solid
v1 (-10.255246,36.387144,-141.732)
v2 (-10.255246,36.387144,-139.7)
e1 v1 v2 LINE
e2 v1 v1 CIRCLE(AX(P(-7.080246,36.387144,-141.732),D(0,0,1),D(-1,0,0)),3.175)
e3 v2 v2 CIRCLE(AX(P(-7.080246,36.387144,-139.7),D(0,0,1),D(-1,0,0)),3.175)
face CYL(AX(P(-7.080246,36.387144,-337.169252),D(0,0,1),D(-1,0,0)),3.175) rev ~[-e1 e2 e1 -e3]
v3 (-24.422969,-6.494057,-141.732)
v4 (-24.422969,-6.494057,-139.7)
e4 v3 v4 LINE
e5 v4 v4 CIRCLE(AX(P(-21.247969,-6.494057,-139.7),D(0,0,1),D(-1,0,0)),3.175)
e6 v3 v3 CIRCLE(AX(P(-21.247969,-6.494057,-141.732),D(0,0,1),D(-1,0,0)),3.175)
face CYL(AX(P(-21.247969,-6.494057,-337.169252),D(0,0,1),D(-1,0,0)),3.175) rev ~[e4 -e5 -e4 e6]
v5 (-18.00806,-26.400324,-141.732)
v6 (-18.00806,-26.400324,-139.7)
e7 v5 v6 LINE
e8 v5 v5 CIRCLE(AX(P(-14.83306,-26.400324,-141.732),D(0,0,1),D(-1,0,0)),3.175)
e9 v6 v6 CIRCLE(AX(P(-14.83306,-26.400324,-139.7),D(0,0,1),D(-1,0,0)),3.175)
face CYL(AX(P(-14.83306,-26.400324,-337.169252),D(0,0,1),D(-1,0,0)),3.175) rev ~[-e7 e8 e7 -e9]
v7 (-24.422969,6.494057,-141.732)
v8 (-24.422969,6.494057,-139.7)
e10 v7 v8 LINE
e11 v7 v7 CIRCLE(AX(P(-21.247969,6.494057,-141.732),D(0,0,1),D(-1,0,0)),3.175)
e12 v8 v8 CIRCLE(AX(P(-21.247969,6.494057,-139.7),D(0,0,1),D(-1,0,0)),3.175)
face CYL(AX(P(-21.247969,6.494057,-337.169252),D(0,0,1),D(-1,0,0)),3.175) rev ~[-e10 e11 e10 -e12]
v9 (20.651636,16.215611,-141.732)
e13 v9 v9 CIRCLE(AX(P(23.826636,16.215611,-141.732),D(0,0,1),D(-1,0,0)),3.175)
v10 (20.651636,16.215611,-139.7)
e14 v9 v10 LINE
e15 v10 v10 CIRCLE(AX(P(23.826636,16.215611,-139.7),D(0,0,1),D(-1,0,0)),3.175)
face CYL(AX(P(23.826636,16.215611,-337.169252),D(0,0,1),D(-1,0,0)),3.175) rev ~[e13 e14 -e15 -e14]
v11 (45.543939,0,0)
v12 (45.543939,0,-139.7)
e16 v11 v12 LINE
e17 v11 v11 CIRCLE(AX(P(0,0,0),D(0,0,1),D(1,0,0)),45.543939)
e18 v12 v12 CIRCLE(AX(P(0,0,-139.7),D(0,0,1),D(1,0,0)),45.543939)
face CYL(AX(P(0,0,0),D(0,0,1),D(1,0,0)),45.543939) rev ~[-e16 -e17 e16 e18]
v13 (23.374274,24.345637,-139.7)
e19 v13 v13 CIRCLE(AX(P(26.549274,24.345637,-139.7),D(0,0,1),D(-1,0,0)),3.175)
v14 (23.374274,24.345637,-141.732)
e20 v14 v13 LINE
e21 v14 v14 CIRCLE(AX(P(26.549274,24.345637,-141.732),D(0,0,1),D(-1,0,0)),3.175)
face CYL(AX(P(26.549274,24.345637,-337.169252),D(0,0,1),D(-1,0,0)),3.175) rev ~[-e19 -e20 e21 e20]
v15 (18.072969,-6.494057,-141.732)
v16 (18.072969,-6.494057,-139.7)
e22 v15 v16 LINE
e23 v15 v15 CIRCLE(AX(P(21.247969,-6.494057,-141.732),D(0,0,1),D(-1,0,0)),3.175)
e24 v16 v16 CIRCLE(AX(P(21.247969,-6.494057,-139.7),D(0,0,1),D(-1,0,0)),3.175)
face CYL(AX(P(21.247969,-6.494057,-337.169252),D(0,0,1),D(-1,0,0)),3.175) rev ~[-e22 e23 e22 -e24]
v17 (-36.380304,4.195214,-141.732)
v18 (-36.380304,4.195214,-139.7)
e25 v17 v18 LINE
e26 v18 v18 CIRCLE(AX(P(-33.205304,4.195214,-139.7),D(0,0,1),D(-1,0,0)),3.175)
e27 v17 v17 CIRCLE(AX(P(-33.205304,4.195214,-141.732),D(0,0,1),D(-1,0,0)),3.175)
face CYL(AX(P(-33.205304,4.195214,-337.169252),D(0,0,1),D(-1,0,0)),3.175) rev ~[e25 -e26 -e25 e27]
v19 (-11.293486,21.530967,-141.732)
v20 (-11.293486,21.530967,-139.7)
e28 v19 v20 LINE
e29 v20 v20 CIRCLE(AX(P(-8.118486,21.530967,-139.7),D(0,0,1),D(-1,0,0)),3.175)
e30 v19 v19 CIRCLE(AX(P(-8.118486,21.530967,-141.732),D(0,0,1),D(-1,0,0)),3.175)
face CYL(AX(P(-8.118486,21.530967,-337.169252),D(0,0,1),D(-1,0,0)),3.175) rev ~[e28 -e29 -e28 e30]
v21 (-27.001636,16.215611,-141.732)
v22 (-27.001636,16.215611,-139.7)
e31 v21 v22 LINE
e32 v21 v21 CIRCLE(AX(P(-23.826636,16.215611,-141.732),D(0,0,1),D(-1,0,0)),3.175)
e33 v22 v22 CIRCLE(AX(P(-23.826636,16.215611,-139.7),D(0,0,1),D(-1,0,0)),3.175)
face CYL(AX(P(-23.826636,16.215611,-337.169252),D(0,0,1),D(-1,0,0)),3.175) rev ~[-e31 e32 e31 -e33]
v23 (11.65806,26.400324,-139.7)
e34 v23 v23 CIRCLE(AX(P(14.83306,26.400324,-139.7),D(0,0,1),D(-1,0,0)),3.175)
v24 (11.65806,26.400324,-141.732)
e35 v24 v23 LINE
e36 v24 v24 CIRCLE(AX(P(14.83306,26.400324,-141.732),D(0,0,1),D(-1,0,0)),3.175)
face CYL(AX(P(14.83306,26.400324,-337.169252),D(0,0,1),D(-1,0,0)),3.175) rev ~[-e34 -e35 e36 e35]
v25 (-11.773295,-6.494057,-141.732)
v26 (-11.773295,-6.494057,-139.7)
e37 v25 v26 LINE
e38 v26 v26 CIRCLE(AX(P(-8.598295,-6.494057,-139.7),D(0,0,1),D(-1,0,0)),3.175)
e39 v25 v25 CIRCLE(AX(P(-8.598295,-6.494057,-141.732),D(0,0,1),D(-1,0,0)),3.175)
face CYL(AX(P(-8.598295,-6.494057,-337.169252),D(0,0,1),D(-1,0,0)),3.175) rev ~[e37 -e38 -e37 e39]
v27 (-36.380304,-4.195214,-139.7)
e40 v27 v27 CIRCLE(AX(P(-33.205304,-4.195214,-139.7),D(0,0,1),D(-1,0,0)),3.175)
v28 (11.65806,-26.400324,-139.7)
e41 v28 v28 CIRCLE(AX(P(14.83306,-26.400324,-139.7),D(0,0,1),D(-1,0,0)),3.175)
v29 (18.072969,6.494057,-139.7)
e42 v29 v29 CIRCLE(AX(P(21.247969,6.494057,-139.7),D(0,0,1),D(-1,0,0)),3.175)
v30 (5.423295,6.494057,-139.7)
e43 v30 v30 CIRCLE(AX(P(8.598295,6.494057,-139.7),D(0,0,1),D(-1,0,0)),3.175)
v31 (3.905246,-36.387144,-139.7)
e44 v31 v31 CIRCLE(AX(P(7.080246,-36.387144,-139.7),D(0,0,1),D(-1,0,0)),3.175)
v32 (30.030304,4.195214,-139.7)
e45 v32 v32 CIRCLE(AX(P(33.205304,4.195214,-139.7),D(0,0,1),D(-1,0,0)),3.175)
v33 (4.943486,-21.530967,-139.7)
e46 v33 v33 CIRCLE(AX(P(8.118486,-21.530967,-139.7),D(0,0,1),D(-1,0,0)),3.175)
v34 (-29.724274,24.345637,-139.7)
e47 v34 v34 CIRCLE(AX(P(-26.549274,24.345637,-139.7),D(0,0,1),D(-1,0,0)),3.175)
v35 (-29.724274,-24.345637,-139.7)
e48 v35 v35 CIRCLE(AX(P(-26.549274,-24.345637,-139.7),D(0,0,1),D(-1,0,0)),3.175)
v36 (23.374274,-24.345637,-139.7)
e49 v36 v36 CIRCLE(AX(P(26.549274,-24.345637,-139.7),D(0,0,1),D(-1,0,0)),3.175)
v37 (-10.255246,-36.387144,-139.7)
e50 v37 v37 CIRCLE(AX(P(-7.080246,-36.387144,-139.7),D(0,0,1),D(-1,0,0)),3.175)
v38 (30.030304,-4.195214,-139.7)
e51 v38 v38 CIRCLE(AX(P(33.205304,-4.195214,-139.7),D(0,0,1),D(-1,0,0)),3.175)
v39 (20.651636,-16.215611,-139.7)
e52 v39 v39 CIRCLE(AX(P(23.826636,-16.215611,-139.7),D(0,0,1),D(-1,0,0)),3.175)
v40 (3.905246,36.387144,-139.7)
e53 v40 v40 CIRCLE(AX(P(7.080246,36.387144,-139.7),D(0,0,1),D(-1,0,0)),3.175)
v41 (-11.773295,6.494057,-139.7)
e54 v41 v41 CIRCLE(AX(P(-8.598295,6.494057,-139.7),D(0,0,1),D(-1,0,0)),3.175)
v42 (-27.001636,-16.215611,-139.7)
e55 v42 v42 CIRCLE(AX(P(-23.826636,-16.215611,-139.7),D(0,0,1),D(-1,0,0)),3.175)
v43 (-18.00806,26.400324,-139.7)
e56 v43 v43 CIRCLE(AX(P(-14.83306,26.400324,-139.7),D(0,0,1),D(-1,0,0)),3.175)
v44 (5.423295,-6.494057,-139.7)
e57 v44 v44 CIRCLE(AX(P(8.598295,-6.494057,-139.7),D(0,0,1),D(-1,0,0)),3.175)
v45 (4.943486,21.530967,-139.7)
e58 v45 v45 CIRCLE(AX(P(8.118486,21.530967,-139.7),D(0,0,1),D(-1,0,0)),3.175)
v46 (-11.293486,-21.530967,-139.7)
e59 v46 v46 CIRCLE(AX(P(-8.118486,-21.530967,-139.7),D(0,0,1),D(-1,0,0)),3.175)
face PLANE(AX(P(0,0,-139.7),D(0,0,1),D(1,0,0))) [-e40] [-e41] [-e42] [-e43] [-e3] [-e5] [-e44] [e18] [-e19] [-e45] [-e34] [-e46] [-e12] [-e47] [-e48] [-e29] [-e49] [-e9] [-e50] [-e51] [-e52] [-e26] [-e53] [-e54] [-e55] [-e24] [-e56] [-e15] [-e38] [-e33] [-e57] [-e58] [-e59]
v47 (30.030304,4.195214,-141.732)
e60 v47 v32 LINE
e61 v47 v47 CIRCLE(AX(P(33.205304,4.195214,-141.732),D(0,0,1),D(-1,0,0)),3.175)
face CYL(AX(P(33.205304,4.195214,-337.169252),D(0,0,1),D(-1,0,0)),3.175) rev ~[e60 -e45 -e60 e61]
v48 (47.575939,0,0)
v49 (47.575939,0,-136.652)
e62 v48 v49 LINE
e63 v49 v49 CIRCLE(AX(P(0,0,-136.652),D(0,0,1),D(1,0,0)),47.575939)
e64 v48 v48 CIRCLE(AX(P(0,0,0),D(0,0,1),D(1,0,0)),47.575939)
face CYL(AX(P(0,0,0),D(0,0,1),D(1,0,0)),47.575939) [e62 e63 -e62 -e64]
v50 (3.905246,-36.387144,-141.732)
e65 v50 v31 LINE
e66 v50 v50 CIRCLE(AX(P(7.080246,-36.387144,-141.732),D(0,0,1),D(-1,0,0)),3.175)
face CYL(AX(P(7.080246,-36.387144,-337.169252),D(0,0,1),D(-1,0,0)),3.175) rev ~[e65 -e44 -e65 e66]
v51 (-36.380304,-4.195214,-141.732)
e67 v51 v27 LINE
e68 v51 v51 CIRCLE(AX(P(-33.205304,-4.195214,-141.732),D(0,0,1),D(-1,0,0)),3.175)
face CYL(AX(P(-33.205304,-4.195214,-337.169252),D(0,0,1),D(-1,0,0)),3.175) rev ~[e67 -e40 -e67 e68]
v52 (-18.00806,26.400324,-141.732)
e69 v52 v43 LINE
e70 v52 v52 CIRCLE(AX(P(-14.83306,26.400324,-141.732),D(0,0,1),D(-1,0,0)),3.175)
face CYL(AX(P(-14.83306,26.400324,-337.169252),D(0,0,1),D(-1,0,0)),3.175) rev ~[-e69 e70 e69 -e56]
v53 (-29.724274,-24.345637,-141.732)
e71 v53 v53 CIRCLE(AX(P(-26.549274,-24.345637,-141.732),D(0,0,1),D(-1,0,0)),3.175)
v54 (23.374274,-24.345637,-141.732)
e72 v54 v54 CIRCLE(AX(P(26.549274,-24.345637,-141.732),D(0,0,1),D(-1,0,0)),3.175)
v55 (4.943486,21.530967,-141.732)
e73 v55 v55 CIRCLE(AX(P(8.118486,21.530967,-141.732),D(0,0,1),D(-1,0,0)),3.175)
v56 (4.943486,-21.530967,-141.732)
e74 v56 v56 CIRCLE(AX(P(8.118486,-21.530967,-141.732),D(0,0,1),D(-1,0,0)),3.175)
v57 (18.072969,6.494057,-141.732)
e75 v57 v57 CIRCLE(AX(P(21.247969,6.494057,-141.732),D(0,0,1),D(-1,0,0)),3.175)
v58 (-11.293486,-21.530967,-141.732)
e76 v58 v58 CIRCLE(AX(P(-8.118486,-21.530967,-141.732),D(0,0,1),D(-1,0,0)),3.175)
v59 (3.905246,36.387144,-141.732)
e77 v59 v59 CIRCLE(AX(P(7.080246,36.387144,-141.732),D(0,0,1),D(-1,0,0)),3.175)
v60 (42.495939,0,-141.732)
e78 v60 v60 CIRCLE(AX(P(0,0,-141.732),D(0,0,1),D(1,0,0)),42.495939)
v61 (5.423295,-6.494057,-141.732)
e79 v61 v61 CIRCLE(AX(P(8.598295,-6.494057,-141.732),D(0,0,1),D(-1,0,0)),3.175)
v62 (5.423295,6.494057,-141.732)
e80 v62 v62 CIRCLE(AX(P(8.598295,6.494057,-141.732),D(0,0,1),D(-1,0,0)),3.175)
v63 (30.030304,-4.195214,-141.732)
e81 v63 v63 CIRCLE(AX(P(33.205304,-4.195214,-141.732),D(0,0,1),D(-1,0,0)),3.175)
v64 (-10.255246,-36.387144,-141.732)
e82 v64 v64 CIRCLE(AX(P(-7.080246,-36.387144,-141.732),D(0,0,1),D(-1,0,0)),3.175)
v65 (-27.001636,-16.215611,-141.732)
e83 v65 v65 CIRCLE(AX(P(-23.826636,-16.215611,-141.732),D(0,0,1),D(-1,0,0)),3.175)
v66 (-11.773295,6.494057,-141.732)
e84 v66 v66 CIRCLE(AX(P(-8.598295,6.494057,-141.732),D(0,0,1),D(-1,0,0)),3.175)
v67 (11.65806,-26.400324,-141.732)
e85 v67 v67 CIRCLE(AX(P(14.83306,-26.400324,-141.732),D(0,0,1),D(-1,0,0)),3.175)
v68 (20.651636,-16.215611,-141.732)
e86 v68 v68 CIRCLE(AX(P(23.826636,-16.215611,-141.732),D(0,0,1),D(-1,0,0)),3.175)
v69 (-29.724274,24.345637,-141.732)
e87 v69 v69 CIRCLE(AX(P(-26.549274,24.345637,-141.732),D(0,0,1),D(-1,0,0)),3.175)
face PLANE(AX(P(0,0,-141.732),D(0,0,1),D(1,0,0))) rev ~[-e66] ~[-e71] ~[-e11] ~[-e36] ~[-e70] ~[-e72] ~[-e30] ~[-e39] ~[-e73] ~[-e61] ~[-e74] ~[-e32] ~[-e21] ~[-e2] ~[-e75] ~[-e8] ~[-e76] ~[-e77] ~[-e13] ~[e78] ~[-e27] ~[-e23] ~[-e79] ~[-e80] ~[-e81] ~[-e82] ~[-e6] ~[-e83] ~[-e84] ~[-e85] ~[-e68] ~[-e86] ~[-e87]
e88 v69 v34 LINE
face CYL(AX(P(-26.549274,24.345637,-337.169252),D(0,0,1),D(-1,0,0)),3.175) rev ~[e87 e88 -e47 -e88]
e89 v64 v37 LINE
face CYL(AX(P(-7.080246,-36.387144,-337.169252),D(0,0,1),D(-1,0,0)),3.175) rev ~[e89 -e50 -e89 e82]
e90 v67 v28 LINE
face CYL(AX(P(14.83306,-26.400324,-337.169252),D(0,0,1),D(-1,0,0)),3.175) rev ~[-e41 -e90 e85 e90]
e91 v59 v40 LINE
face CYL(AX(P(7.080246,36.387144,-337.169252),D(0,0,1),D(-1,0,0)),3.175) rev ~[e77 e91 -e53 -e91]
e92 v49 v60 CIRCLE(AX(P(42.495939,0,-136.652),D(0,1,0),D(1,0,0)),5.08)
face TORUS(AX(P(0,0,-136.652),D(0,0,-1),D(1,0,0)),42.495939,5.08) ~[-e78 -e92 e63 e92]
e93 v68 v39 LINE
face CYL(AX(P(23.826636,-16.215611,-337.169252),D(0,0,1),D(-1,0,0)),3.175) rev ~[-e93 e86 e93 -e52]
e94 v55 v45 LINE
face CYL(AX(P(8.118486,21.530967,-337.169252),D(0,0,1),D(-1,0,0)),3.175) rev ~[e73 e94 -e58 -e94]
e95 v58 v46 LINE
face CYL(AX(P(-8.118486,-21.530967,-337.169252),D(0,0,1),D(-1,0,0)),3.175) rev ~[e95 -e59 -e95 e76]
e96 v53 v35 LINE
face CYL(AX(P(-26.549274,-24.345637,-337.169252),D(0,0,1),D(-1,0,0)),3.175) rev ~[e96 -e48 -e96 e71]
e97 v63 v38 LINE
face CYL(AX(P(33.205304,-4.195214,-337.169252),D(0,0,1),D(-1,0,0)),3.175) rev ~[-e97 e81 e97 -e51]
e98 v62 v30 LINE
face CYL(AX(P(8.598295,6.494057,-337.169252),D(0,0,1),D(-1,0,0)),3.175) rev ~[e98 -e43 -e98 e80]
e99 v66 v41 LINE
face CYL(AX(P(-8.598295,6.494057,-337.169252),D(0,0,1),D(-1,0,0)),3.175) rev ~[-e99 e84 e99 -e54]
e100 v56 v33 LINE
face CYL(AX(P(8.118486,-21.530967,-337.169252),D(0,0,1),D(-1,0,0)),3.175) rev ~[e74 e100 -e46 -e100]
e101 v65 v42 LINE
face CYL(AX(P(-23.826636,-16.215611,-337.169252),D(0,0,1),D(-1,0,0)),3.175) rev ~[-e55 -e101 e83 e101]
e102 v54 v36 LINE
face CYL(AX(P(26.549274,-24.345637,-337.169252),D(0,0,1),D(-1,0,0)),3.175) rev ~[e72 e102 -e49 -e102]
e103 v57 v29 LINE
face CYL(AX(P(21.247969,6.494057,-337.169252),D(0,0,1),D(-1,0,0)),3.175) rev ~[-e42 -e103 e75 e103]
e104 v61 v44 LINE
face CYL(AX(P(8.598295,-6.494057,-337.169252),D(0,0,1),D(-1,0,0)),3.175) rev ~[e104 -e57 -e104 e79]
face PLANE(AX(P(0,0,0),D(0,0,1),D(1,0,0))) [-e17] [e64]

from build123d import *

# Parameters (mm, degrees)
F0_R     = 45.5439388368
F1_DEPTH = 139.7
F2_T     = 2.032
F5_D     = 6.35
F6_D     = 6.35
F7_D     = 6.35


# Not quite as in the source:
# - a fillet or chamfer that OpenCascade refuses, or shapes differently, is made with other operations: its cross-section is extruded or revolved along the edge and cut away or added


with BuildPart() as f1:
    # F0 (on Top) → F1 (new body)
    with BuildSketch(Plane.XY):
        Circle(F0_R)
    extrude(amount=-F1_DEPTH)

    # F2
    f2_openings = [f1.faces().sort_by_distance(p)[0] for p in [
        (0, 0, 0),
    ]]
    offset(amount=F2_T, openings=f2_openings, kind=Kind.INTERSECTION)

    # F3: fillet of radius 5.08 on 1 edges, made by hand

    # F3_s1 → F3_t2 (revolve, cut)
    with BuildSketch(Plane.XZ):
        with BuildLine():
            ThreePointArc((47.5759388368, -136.652), (46.0880412852, -140.2441024484), (42.4959388368, -141.732))
            Line((42.4959388368, -141.732), (47.5759388368, -141.732))
            Line((47.5759388368, -141.732), (47.5759388368, -136.652))
        make_face()
    revolve(axis=Axis((0, 0, -141.732), (0, 0, 1)), mode=Mode.SUBTRACT)

    # F5 (through all)
    with Locations(Plane(origin=(0, 0, -141.732), x_dir=(1, 0, 0), z_dir=(0, 0, -1))):
        with Locations((-8.5982947547, 6.4940573648), (-8.1184855662, 21.5309672058), (-14.8330600932, 26.4003239572), (-7.0802457631, 36.3871436566), (-26.5492741019, 24.3456372991), (-23.826636374, 16.2156112492), (-21.2479694184, 6.4940573648), (-33.2053042948, 4.1952142492)):
            Hole(F5_D / 2)

    # F6 (through all)
    with Locations(Plane(origin=(0, 0, -141.732), x_dir=(1, 0, 0), z_dir=(0, 0, -1))):
        with Locations((8.5982947547, 6.4940573648), (21.2479694184, 6.4940573648), (33.2053042948, 4.1952142492), (8.1184855662, 21.5309672058), (14.8330600932, 26.4003239572), (7.0802457631, 36.3871436566), (23.826636374, 16.2156112492), (26.5492741019, 24.3456372991)):
            Hole(F6_D / 2)

    # F7 (through all)
    with Locations(Plane(origin=(0, 0, -141.732), x_dir=(1, 0, 0), z_dir=(0, 0, -1))):
        with Locations((-33.2053042948, -4.1952142492), (-8.5982947547, -6.4940573648), (-21.2479694184, -6.4940573648), (-8.1184855662, -21.5309672058), (-14.8330600932, -26.4003239572), (-7.0802457631, -36.3871436566), (-26.5492741019, -24.3456372991), (-23.826636374, -16.2156112492), (8.5982947547, -6.4940573648), (33.2053042948, -4.1952142492), (21.2479694184, -6.4940573648), (23.826636374, -16.2156112492), (26.5492741019, -24.3456372991), (14.8330600932, -26.4003239572), (8.1184855662, -21.5309672058), (7.0802457631, -36.3871436566)):
            Hole(F7_D / 2)


solid = f1.part
